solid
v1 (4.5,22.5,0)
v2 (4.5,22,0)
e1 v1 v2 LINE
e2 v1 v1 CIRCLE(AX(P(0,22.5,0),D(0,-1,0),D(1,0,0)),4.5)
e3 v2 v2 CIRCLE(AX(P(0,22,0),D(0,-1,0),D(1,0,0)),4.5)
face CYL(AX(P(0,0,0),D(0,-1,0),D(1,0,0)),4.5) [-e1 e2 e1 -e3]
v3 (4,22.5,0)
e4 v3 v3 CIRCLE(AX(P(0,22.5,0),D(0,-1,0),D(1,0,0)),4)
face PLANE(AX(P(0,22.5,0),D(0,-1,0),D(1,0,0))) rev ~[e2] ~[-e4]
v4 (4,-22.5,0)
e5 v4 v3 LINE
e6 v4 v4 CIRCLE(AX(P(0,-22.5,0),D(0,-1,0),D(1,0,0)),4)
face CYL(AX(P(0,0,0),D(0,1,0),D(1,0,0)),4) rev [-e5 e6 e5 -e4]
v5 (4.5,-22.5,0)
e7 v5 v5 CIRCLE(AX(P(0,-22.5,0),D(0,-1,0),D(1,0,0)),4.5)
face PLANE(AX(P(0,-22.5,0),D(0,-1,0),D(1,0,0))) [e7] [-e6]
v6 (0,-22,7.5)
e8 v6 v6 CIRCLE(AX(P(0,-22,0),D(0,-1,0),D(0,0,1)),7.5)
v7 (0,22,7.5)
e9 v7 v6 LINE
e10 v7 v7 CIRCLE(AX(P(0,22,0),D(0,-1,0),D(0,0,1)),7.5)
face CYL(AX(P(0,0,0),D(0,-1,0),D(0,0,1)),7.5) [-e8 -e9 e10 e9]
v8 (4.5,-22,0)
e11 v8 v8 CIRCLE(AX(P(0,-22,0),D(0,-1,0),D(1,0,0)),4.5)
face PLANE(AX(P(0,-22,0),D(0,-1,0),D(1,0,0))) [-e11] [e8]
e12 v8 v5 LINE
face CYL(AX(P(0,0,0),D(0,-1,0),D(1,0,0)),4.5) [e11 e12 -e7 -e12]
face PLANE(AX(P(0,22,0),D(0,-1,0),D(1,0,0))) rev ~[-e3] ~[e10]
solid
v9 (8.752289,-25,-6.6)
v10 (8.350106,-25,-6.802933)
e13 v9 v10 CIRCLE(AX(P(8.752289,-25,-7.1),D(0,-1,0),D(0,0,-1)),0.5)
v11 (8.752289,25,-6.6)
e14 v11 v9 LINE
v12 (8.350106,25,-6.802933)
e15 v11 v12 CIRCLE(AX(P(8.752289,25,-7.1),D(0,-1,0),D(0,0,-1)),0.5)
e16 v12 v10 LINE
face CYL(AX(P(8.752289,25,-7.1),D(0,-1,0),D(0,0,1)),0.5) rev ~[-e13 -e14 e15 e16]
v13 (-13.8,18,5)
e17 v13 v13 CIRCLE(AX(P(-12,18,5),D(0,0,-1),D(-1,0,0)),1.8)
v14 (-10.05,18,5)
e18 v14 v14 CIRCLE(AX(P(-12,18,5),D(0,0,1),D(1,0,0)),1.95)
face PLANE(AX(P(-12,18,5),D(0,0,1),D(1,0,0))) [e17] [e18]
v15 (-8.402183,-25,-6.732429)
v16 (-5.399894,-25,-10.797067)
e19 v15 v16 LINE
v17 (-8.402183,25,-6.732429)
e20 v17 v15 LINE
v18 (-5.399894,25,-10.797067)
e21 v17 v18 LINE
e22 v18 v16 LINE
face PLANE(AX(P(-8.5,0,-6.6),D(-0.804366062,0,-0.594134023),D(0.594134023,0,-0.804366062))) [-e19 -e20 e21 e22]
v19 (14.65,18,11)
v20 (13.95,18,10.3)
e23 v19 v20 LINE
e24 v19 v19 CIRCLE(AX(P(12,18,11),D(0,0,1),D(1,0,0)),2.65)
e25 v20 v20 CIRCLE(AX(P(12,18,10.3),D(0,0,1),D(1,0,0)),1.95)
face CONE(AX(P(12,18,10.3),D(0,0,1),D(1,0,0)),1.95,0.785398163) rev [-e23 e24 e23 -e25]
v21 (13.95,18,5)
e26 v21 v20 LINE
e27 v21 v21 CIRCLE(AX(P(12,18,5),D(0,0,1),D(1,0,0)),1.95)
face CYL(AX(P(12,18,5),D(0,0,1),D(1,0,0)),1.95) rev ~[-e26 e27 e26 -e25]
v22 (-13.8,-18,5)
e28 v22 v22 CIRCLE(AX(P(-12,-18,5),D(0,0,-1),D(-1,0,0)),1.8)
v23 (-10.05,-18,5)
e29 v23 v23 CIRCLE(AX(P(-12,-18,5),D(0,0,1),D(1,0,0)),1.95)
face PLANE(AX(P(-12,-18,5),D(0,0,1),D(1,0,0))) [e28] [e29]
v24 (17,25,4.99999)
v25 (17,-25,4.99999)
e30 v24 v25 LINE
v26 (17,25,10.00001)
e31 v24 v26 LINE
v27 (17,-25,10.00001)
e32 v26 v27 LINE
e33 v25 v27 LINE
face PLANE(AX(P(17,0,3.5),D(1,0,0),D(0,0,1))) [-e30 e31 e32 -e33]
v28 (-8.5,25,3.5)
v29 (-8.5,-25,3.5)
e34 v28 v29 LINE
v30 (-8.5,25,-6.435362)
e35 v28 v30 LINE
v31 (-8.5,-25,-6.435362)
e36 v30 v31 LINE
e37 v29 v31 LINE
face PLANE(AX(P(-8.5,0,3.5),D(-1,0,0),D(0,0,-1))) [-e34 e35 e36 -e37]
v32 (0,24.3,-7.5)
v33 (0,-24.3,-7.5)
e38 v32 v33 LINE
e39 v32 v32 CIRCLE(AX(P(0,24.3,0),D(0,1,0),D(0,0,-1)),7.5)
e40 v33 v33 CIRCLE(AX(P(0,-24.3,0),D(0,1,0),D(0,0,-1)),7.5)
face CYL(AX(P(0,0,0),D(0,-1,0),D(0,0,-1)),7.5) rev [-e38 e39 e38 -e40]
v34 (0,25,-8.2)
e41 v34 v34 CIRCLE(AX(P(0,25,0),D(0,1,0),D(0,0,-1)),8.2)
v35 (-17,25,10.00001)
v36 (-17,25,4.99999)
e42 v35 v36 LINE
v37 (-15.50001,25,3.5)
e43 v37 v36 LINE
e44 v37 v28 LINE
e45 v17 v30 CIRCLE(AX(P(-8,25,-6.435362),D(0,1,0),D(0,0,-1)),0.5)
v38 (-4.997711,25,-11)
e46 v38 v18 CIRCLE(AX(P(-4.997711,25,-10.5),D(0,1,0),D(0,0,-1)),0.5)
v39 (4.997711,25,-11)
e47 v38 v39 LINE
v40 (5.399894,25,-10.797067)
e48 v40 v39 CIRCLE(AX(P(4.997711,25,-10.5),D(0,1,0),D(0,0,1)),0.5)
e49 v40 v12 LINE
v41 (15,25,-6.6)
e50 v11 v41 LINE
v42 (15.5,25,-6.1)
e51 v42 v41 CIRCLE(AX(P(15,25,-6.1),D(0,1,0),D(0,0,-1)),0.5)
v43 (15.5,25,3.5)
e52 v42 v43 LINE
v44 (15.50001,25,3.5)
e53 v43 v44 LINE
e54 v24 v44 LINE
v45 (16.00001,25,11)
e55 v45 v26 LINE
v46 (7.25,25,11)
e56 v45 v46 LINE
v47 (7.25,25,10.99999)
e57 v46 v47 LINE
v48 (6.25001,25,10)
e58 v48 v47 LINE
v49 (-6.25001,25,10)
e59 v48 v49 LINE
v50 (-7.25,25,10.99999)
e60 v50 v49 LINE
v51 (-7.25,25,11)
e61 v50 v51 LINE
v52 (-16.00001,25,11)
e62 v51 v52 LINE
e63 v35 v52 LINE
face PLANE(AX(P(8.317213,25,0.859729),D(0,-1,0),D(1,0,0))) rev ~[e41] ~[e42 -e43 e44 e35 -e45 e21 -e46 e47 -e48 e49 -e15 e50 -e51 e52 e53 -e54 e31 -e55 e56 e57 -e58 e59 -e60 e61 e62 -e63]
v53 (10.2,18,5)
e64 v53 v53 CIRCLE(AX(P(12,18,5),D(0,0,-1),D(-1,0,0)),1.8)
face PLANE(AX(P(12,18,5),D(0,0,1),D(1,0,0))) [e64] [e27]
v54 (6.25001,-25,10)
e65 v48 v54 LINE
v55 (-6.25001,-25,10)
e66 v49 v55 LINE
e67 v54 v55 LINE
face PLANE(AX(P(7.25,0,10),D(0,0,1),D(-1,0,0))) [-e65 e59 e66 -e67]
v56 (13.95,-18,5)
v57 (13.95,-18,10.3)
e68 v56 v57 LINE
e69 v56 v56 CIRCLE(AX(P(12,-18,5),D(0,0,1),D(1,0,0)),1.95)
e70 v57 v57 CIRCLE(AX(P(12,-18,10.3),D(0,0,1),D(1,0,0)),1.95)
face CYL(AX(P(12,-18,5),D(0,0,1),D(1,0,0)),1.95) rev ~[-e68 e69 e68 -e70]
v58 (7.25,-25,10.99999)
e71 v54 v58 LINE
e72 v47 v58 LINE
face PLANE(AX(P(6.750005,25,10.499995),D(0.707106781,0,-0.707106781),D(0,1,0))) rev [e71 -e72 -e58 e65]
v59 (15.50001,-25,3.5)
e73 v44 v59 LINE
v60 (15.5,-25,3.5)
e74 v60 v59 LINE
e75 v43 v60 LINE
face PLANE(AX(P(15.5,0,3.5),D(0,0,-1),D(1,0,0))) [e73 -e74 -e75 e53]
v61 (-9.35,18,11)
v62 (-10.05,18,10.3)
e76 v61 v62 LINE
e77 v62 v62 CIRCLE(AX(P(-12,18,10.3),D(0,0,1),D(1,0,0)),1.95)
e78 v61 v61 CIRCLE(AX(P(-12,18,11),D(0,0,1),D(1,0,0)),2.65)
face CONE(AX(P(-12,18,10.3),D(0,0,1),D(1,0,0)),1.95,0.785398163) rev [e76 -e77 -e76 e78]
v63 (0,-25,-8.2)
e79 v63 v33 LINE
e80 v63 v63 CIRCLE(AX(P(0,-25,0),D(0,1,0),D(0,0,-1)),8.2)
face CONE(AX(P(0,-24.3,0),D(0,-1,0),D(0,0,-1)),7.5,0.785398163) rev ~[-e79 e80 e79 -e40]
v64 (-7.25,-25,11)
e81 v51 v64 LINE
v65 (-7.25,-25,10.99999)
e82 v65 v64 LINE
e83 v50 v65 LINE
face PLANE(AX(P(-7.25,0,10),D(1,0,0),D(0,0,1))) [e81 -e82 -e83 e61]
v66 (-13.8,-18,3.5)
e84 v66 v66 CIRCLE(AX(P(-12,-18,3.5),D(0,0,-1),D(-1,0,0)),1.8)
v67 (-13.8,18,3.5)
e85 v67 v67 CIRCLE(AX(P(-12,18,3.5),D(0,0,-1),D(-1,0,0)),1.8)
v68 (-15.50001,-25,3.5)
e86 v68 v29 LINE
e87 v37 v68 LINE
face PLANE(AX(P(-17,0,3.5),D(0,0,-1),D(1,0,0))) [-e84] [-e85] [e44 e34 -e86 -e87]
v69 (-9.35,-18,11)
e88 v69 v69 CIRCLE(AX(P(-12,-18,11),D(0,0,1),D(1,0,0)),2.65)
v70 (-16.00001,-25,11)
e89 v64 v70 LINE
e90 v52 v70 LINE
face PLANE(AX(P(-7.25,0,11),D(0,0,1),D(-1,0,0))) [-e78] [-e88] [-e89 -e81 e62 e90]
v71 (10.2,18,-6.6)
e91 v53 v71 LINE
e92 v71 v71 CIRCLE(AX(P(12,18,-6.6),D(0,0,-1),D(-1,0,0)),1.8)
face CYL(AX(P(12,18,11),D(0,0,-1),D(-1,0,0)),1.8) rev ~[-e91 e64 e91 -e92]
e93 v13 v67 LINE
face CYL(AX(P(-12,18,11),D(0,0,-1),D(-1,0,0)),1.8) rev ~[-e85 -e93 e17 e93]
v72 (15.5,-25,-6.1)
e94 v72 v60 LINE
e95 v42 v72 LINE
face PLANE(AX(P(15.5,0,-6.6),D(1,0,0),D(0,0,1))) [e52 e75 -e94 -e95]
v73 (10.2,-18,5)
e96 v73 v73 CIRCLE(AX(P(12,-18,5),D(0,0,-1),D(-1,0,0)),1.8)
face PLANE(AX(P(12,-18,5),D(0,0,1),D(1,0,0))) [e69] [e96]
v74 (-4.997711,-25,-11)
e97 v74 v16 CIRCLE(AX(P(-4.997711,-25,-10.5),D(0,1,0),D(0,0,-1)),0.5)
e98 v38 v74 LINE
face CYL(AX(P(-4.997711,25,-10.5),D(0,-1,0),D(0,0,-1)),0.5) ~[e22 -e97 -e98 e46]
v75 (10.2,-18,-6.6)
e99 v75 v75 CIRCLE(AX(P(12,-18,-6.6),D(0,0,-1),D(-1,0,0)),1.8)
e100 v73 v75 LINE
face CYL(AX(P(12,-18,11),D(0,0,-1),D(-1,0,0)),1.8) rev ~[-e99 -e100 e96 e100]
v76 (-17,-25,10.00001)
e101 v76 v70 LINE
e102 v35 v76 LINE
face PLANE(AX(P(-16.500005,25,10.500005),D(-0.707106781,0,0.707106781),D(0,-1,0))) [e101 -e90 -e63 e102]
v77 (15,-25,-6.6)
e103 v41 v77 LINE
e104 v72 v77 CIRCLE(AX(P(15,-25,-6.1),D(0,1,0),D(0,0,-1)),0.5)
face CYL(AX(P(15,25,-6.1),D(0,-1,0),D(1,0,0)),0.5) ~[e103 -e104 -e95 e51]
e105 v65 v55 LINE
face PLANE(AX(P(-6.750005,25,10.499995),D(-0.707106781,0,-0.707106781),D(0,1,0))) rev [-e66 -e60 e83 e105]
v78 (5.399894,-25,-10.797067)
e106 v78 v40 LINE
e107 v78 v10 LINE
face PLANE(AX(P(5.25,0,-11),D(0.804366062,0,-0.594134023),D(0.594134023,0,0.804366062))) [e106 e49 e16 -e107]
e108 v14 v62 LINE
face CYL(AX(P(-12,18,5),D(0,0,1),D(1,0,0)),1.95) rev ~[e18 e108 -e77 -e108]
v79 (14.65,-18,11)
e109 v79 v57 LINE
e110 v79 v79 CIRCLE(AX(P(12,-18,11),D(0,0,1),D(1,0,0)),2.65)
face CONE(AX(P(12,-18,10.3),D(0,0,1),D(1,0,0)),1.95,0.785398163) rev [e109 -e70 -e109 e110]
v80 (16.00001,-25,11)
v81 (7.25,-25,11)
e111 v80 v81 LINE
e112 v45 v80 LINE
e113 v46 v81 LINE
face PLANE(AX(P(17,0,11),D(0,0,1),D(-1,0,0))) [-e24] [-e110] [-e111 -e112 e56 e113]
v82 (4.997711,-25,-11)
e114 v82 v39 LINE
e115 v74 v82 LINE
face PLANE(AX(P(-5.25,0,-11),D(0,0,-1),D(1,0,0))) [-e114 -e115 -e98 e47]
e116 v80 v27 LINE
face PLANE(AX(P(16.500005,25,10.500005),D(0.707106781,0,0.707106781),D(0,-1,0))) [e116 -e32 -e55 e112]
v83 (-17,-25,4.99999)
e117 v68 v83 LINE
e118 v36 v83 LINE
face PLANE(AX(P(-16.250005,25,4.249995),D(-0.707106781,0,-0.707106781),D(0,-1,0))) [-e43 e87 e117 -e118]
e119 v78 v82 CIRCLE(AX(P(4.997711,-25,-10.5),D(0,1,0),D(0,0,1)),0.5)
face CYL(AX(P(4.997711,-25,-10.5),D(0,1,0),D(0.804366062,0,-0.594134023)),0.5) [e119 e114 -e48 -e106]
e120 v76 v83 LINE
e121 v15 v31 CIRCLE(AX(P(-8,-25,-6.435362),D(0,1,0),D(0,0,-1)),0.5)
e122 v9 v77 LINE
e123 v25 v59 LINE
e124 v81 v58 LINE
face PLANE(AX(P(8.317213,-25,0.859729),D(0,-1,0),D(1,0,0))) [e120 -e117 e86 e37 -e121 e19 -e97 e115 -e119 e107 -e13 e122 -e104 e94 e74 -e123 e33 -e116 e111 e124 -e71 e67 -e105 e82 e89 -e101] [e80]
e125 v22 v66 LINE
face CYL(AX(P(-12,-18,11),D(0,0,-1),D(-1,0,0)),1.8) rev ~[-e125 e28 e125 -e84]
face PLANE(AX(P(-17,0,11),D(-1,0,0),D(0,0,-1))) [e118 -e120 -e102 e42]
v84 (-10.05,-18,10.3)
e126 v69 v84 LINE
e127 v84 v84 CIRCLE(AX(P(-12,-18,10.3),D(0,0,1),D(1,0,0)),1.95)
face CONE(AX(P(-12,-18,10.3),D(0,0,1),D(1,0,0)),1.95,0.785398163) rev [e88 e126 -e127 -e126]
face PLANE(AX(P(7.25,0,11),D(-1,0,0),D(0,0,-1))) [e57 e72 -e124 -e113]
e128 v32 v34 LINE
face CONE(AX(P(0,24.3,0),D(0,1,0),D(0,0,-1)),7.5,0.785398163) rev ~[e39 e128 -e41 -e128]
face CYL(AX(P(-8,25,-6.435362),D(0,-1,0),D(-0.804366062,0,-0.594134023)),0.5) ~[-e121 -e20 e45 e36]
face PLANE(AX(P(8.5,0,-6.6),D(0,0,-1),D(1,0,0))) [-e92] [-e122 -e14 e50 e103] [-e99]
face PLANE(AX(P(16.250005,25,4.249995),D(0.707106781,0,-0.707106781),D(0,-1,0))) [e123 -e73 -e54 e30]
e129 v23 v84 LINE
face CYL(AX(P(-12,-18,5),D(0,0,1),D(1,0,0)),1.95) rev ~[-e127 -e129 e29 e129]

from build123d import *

# Parameters (mm, degrees)
F1_DEPTH       = 25
F2_SIZE        = 0.99999
F3_SIZE        = 1.49999
F4_R           = 0.5
F6_D           = 3.6
F6_CBORE_D     = 3.9
F6_CBORE_DEPTH = 6
F7_SIZE        = 0.7
F0_R           = 4.5
F8_DEPTH       = 22
F0_R_2         = 4
F9_DEPTH       = 22.5


# Not quite as in the source:
# - a fillet or chamfer is up to 0.001 mm smaller than in the source, because OpenCascade refuses the exact size


with BuildPart() as f1:
    # F0 (on Front) → F1 (new body, symmetric)
    with BuildSketch(Plane.XZ):
        with BuildLine():
            ThreePointArc((0, 7.5), (5.3033008589, 5.3033008589), (7.5, 0))
            ThreePointArc((7.5, 0), (5.3033008589, -5.3033008589), (0, -7.5))
            Line((0, -7.5), (0, -11))
            Line((0, -11), (5.25, -11))
            Line((5.25, -11), (8.5, -6.6))
            Line((8.5, -6.6), (15.5, -6.6))
            Line((15.5, -6.6), (15.5, 3.5))
            Line((15.5, 3.5), (17, 3.5))
            Line((17, 3.5), (17, 11))
            Line((17, 11), (7.25, 11))
            Line((7.25, 11), (7.25, 10))
            Line((7.25, 10), (0, 10))
            Line((0, 10), (0, 7.5))
        make_face()
        with BuildLine():
            ThreePointArc((0, -7.5), (-7.5, 0), (0, 7.5))
            Line((0, 7.5), (0, 10))
            Line((0, 10), (-7.25, 10))
            Line((-7.25, 10), (-7.25, 11))
            Line((-7.25, 11), (-17, 11))
            Line((-17, 11), (-17, 3.5))
            Line((-17, 3.5), (-15.5, 3.5))
            Line((-15.5, 3.5), (-8.5, 3.5))
            Line((-8.5, 3.5), (-8.5, -6.6))
            Line((-8.5, -6.6), (-5.25, -11))
            Line((-5.25, -11), (0, -11))
            Line((0, -11), (0, -7.5))
        make_face()
    extrude(amount=F1_DEPTH, both=True)

    # F2 (size 1 in the source; OpenCascade refuses exactly that, so slightly less here)
    f2_edges = [f1.edges().sort_by_distance(p)[0] for p in [
        (7.25, 0, 10),
        (17, 0, 11),
        (-7.25, 0, 10),
        (-17, 0, 11),
    ]]
    chamfer(f2_edges, length=F2_SIZE)

    # F3 (size 1.5 in the source; OpenCascade refuses exactly that, so slightly less here)
    f3_edges = [f1.edges().sort_by_distance(p)[0] for p in [
        (17, 0, 3.5),
        (-17, 0, 3.5),
    ]]
    chamfer(f3_edges, length=F3_SIZE)

    # F4
    f4_edges = [f1.edges().sort_by_distance(p)[0] for p in [
        (15.5, 0, -6.6),
        (8.5, 0, -6.6),
        (5.25, 0, -11),
        (-5.25, 0, -11),
        (-8.5, 0, -6.6),
    ]]
    fillet(f4_edges, radius=F4_R)

    # F6 (through all)
    with Locations(Plane.XY.offset(11)):
        with Locations((12, 18), (12, -18), (-12, 18), (-12, -18)):
            CounterBoreHole(F6_D / 2, F6_CBORE_D / 2, F6_CBORE_DEPTH)

    # F7
    f7_edges = [f1.edges().sort_by_distance(p)[0] for p in [
        (-7.5, -25, 0),
        (-7.5, 25, 0),
        (10.05, 18, 11),
        (10.05, -18, 11),
        (-13.95, 18, 11),
        (-13.95, -18, 11),
    ]]
    chamfer(f7_edges, length=F7_SIZE)


with BuildPart() as f8:
    # F0 (on Front) → F8 (new body, symmetric)
    with BuildSketch(Plane.XZ):
        with BuildLine():
            ThreePointArc((0, -7.5), (5.3033008589, -5.3033008589), (7.5, 0))
            ThreePointArc((7.5, 0), (5.3033008589, 5.3033008589), (0, 7.5))
            ThreePointArc((0, 7.5), (-7.5, 0), (0, -7.5))
        make_face()
        Circle(F0_R, mode=Mode.SUBTRACT)
    extrude(amount=F8_DEPTH, both=True)

    # F0 (on Front) → F9 (join, symmetric)
    with BuildSketch(Plane.XZ):
        Circle(F0_R)
        Circle(F0_R_2, mode=Mode.SUBTRACT)
    extrude(amount=F9_DEPTH, both=True)


solid = Compound([f1.part, f8.part])
